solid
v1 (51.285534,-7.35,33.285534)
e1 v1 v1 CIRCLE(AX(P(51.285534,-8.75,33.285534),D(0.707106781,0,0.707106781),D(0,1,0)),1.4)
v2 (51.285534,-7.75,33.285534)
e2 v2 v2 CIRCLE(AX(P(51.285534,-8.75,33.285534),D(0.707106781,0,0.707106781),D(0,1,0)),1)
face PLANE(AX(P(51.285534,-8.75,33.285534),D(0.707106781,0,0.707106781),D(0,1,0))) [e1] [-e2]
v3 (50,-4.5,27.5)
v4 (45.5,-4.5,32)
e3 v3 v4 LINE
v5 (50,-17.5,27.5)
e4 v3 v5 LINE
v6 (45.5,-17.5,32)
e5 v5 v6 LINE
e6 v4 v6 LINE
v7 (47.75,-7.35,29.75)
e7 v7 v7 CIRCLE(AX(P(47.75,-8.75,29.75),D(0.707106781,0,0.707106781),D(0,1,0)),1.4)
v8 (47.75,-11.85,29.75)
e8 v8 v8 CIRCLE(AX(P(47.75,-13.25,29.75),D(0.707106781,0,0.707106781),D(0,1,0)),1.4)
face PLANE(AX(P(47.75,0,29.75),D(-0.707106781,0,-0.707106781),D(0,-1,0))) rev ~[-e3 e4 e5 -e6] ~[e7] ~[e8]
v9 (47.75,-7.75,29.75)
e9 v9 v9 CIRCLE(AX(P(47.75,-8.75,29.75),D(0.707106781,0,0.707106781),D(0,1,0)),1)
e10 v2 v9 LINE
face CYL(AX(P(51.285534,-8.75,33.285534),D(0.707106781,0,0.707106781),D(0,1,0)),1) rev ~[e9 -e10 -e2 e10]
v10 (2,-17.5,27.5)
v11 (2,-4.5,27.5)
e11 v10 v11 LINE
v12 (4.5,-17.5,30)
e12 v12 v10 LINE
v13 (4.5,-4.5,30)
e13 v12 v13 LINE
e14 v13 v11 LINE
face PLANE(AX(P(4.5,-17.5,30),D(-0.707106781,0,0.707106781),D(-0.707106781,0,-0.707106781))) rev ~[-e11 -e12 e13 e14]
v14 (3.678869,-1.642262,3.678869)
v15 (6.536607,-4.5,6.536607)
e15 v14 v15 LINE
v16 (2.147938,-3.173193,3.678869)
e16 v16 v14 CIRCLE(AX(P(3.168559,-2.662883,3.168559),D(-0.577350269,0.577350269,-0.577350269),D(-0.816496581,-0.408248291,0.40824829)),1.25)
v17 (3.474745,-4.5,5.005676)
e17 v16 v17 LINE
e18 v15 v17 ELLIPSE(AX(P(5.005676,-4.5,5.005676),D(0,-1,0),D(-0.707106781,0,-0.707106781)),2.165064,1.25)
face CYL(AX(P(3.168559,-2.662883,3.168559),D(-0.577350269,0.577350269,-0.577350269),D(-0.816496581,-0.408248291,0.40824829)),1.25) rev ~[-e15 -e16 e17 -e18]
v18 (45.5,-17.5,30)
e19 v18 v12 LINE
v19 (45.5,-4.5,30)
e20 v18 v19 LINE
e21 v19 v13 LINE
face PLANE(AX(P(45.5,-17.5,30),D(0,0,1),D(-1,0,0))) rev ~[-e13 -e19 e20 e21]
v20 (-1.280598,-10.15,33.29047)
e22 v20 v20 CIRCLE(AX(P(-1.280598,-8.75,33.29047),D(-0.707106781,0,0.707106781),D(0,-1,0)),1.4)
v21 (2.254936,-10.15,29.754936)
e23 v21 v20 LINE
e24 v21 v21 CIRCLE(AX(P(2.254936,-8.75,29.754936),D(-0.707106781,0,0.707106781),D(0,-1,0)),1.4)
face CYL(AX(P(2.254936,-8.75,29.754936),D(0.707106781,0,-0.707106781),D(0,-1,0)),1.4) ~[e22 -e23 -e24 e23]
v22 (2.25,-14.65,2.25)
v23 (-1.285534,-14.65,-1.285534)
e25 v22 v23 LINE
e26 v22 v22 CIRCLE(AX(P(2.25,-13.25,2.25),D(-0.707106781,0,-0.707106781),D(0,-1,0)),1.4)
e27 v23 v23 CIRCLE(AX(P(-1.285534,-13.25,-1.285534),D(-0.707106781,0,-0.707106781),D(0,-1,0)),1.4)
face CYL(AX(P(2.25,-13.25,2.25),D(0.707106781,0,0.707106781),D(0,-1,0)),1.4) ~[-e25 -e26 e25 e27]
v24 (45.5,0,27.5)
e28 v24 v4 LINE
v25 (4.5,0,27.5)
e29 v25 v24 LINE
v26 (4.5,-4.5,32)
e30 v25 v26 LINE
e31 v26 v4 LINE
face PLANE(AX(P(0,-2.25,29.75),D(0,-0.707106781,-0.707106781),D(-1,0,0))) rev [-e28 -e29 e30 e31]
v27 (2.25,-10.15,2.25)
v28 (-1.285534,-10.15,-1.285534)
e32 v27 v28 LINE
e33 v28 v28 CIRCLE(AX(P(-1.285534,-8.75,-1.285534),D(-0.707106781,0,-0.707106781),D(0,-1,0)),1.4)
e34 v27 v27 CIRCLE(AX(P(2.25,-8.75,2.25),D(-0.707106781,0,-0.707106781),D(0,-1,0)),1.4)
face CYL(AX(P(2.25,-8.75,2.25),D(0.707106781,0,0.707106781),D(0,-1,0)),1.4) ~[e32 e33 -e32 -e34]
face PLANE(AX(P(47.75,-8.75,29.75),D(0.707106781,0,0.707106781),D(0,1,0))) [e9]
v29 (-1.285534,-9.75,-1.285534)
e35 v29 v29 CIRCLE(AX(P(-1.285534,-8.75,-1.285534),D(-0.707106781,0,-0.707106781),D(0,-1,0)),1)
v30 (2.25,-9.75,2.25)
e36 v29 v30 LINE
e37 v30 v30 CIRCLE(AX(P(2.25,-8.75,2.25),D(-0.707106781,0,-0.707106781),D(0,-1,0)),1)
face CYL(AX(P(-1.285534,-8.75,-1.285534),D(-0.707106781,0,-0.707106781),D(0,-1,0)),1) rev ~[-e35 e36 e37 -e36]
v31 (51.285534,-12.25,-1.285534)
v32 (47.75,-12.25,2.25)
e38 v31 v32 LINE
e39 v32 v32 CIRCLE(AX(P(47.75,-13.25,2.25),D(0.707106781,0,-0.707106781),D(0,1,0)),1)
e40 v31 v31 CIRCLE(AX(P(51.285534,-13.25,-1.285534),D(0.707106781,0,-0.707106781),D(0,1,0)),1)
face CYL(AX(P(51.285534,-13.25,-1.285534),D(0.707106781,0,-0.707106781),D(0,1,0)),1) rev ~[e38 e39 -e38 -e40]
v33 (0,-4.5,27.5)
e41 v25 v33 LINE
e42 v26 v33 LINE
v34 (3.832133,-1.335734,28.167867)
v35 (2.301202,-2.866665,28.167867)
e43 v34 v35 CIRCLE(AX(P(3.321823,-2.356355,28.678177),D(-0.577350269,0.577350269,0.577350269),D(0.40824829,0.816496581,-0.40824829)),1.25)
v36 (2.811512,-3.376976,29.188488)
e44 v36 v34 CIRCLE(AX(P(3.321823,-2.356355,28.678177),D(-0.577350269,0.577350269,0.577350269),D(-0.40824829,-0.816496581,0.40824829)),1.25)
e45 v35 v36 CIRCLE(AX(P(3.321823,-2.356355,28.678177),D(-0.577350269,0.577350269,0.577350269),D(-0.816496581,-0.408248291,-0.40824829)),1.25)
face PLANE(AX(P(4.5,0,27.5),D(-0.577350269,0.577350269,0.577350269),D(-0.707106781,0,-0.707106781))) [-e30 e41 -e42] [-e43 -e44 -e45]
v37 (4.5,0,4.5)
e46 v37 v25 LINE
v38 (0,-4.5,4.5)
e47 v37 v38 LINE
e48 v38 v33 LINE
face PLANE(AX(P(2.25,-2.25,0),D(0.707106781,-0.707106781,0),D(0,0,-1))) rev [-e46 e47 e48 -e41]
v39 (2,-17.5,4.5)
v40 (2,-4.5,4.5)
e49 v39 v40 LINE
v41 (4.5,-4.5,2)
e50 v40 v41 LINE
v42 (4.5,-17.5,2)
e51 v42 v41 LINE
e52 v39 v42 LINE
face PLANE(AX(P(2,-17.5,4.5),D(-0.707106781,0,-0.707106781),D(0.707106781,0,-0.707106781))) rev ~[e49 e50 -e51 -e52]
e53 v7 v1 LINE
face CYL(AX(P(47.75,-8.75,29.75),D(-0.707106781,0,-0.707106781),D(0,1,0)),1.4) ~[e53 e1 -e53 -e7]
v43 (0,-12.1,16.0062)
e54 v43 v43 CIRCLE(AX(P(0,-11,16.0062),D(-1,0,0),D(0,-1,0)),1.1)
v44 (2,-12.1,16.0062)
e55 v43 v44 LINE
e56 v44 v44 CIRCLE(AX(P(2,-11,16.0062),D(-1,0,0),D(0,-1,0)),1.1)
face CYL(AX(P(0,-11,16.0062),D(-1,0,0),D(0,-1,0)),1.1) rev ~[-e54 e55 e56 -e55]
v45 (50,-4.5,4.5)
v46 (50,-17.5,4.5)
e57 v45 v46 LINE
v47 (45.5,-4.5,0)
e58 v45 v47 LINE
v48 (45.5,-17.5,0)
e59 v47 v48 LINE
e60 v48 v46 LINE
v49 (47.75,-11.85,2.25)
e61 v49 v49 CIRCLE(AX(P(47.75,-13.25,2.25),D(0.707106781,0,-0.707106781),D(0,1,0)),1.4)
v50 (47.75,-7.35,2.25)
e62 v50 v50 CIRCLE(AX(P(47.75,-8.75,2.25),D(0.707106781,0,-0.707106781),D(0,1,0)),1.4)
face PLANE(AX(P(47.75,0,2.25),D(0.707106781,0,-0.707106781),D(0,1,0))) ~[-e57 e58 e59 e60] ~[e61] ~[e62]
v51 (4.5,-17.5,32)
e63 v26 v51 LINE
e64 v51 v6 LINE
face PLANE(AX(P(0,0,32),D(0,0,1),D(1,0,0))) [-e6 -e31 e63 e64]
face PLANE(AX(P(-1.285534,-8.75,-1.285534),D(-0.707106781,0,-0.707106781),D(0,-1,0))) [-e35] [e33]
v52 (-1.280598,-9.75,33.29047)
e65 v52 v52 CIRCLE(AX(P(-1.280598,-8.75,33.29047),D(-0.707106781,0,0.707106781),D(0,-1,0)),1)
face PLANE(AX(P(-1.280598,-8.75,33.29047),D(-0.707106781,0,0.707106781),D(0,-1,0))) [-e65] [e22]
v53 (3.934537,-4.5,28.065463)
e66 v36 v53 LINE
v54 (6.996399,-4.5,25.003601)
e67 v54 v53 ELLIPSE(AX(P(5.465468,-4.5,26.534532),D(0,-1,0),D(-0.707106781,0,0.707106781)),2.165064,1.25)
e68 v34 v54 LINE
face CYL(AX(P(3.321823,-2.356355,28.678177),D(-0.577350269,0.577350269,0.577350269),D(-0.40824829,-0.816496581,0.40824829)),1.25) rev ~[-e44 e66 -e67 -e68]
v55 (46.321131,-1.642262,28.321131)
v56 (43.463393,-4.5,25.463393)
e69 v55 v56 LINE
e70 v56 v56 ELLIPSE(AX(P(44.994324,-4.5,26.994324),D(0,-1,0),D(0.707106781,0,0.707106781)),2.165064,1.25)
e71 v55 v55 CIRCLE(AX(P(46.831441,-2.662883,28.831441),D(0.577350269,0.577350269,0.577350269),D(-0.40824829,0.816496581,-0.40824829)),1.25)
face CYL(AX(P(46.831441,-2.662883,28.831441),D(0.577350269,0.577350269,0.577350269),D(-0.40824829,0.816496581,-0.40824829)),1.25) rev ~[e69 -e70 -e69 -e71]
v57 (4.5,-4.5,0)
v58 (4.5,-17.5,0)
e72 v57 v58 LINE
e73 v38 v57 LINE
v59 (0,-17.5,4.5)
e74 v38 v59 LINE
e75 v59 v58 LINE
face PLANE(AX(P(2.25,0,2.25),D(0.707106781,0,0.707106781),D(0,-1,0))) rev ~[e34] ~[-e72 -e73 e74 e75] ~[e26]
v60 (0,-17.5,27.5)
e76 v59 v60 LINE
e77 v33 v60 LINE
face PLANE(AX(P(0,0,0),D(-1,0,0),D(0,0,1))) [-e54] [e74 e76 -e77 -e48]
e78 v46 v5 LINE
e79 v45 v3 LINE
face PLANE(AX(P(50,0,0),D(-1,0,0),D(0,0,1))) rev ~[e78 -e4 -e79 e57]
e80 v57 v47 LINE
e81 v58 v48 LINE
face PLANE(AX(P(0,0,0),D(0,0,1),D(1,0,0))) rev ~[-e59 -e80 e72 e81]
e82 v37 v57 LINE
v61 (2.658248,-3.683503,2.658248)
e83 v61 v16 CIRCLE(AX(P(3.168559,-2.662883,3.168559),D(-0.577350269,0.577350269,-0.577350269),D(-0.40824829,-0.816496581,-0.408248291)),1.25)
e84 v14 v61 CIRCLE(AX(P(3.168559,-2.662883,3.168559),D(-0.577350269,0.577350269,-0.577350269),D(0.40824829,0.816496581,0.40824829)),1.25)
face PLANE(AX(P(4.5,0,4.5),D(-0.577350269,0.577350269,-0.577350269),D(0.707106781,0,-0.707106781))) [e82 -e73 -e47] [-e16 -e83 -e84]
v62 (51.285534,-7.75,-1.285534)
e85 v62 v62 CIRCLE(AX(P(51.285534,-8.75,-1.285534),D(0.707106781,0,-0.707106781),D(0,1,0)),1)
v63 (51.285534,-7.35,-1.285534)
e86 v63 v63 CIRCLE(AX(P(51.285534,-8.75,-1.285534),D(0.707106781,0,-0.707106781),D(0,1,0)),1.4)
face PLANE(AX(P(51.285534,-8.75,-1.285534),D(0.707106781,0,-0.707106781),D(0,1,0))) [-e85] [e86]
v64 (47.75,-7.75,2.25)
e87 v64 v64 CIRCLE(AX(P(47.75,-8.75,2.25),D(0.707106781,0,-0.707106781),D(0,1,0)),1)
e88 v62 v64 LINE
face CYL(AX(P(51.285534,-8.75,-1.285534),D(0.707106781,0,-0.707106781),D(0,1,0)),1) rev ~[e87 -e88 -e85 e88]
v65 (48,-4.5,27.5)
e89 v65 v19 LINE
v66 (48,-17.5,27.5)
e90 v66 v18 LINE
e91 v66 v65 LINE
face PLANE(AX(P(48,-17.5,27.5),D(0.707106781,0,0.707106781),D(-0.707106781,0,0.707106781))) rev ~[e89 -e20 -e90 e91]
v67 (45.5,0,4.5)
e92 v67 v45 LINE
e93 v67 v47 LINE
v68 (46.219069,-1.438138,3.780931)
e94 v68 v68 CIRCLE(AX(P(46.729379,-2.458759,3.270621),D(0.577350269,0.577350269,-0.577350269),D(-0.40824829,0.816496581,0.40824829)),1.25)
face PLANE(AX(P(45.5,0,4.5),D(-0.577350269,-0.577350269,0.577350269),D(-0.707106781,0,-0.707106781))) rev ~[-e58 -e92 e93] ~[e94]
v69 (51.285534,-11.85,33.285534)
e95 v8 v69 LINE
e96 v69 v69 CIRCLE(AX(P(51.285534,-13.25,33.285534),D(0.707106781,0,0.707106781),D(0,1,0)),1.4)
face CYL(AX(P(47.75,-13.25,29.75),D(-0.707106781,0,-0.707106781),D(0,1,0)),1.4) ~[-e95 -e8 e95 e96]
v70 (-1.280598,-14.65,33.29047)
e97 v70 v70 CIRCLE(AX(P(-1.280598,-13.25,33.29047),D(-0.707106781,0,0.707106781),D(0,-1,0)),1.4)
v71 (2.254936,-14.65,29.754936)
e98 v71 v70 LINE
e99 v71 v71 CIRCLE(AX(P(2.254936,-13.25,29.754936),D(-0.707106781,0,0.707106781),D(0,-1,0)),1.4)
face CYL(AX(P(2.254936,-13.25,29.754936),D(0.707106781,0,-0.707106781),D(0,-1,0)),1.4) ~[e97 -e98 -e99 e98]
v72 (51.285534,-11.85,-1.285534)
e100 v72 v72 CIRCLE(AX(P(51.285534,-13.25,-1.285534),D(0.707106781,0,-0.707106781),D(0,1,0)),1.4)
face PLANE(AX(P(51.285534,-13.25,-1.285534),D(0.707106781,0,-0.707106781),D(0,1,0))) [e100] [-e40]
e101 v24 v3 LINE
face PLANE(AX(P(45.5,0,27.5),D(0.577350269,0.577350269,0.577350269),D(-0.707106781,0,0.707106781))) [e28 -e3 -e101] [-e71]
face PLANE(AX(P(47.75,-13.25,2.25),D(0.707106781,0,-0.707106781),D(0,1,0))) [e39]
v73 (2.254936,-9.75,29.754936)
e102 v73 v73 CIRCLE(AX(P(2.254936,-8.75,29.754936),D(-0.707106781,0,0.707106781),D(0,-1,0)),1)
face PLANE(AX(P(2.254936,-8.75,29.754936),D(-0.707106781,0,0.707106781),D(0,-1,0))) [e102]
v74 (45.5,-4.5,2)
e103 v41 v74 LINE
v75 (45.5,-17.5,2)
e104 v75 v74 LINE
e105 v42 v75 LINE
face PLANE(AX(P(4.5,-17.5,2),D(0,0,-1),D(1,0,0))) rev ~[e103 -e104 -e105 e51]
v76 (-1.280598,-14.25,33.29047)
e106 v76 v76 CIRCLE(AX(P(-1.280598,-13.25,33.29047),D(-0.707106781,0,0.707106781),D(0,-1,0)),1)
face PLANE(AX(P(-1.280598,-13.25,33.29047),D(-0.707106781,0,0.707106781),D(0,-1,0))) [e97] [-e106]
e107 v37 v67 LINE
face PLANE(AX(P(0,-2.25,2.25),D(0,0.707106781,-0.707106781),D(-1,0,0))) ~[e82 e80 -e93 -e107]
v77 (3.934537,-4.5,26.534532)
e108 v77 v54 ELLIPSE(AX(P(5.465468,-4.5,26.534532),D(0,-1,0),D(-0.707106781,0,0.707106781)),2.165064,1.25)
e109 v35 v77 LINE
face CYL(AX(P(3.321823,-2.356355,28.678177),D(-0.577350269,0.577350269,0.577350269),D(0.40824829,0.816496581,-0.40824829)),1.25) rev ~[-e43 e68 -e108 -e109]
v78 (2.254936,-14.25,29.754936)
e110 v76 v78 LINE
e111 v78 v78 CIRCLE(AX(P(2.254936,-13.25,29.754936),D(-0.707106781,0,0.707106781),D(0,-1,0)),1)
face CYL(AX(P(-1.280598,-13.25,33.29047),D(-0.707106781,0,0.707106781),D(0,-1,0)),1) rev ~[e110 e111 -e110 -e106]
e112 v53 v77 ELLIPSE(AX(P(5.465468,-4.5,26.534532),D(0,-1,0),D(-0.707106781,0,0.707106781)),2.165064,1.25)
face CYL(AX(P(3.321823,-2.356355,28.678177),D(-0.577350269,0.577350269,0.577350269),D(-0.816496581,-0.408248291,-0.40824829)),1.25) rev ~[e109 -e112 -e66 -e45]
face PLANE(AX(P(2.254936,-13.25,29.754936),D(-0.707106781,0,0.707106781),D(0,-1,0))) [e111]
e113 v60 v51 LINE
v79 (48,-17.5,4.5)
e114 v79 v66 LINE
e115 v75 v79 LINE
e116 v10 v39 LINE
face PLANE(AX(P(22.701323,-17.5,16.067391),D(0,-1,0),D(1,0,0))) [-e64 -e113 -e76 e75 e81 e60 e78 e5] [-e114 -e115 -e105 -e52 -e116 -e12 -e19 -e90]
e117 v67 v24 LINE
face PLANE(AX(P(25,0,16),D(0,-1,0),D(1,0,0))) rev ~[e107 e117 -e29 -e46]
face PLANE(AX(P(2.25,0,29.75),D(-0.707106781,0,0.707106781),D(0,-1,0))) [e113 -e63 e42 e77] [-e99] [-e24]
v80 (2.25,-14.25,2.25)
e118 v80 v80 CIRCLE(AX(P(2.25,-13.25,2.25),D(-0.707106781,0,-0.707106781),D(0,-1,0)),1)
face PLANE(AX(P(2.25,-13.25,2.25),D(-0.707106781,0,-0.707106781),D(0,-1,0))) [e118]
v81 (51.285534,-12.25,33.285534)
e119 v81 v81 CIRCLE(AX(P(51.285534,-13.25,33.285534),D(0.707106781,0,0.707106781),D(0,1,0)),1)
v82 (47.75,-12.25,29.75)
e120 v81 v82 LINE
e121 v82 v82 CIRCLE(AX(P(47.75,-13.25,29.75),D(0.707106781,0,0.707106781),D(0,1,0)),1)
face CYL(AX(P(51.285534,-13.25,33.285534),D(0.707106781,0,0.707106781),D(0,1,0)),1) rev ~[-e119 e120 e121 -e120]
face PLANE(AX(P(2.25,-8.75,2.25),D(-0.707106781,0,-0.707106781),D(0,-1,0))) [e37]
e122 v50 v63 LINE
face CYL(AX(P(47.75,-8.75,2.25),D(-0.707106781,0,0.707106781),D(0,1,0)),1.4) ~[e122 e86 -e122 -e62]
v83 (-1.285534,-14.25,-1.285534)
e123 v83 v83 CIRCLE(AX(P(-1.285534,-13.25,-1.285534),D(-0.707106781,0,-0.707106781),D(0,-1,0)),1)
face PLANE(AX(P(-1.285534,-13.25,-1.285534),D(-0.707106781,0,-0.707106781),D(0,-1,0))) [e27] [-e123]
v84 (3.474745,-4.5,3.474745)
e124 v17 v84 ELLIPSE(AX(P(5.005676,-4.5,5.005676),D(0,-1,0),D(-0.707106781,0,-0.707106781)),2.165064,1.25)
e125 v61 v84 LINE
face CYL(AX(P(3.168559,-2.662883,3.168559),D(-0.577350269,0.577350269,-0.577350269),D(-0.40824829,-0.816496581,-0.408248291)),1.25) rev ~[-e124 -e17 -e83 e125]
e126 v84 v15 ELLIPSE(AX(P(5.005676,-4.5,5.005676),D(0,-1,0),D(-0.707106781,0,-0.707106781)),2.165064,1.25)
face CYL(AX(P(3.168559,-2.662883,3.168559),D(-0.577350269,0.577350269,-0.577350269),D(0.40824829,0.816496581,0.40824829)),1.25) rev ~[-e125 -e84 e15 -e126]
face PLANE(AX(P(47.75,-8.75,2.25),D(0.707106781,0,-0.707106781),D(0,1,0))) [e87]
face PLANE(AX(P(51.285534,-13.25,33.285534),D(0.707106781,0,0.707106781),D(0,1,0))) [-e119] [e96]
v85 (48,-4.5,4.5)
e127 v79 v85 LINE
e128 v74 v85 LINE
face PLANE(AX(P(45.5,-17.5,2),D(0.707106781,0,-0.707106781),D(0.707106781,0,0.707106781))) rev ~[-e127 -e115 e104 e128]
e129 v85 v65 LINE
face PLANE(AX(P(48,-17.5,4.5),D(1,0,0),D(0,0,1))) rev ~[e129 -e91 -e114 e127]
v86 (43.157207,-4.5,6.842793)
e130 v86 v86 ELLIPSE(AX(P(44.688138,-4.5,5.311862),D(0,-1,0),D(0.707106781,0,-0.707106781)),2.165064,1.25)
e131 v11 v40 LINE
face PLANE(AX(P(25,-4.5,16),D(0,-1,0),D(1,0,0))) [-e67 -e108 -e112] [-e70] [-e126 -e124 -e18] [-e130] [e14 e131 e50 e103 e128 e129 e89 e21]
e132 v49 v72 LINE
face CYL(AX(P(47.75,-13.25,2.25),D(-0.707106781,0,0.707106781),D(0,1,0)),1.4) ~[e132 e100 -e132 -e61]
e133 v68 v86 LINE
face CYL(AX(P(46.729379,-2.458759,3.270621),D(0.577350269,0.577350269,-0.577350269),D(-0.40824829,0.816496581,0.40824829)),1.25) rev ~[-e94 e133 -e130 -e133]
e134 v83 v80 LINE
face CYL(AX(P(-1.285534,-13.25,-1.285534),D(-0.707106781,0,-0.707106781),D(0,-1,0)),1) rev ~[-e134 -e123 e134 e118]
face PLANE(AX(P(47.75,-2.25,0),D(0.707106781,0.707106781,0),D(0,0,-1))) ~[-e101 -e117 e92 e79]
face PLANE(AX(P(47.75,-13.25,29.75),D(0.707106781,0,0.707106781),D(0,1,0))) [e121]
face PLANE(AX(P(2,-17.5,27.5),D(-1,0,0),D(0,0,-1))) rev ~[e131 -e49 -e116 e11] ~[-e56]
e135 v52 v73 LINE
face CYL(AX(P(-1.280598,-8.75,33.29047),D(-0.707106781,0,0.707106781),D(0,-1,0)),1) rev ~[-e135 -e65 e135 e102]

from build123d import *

# Parameters (mm, degrees)
F0_W      = 50
F0_H      = 32
F1_DEPTH  = 24
F2_SIZE   = 4.5
F3_W      = 64.6181842312
F3_H      = 72.6516954601
F4_DEPTH  = 6.5
F6_DEPTH  = 13
F7_R      = 1.4
F8_DEPTH  = 5
F9_R      = 1.4
F10_DEPTH = 5
F11_R     = 1.4
F12_DEPTH = 5
F13_R     = 1.4
F14_DEPTH = 5
F15_R     = 1
F16_DEPTH = 5
F17_R     = 1
F18_DEPTH = 5
F19_R     = 1
F20_DEPTH = 5
F21_R     = 1
F22_DEPTH = 5
F23_R     = 1.1
F24_DEPTH = 25.4
F25_R     = 1.25
F26_DEPTH = 25.4
F27_R     = 1.25
F28_DEPTH = 25.4
F30_DEPTH = 25.4
F32_DEPTH = 25.4


# Not quite as in the source:
# - a feature names something its author has since deleted; it is built from what else it names


with BuildPart() as f1:
    # F0 (on Front) → F1 (new body)
    with BuildSketch(Plane.XZ):
        with Locations((25, 16)):
            Rectangle(F0_W, F0_H)
    extrude(amount=F1_DEPTH)

    # F2
    f2_edges = [f1.edges().sort_by_distance(p)[0] for p in [
        (50, -12, 0),
        (50, -12, 32),
        (50, 0, 16),
        (50, -24, 16),
        (0, -12, 32),
        (25, 0, 32),
        (25, -24, 32),
        (0, -12, 0),
        (0, 0, 16),
        (0, -24, 16),
        (25, 0, 0),
        (25, -24, 0),
    ]]
    chamfer(f2_edges, length=F2_SIZE)

    # F3 (on face) → F4 (cut)
    with BuildSketch(Plane.XZ.offset(24)):
        with Locations((22.701323498, 16.0673912615)):
            Rectangle(F3_W, F3_H)
    extrude(amount=-F4_DEPTH, mode=Mode.SUBTRACT)

    # F5 (on face) → F6 (cut)
    with BuildSketch(Plane.XZ.offset(17.5)):
        Polygon((4.5, 30), (2, 27.5), (2, 4.5), (4.5, 2), (45.5, 2), (48, 4.5), (48, 27.5), (45.5, 30), align=None)
    extrude(amount=-F6_DEPTH, mode=Mode.SUBTRACT)

    # F7 (on face) → F8 (join)
    with BuildSketch(Plane(origin=(38.75, 0, 38.75), x_dir=(0, 1, 0), z_dir=(0.7071067812, 0, 0.7071067812))):
        with Locations((-13.25, -12.7279220614)):
            Circle(F7_R)
        with Locations((-8.75, -12.7279220614)):
            Circle(F7_R)
    extrude(amount=F8_DEPTH)

    # F9 (on face) → F10 (join)
    with BuildSketch(Plane(origin=(22.75, 0, -22.75), x_dir=(0, 1, 0), z_dir=(0.7071067812, 0, -0.7071067812))):
        with Locations((-13.25, 35.3553390593)):
            Circle(F9_R)
        with Locations((-8.75, 35.3553390593)):
            Circle(F9_R)
    extrude(amount=F10_DEPTH)

    # F11 (on face) → F12 (join)
    with BuildSketch(Plane(origin=(2.25, 0, 2.25), x_dir=(0, -1, 0), z_dir=(-0.7071067812, 0, -0.7071067812))):
        with Locations((13.25, 0)):
            Circle(F11_R)
        with Locations((8.75, 0)):
            Circle(F11_R)
    extrude(amount=F12_DEPTH)

    # F13 (on face) → F14 (join)
    with BuildSketch(Plane(origin=(-13.75, 0, 13.75), x_dir=(0, -1, 0), z_dir=(-0.7071067812, 0, 0.7071067812))):
        with Locations((8.75, 22.6343975133)):
            Circle(F13_R)
        with Locations((13.25, 22.6343975133)):
            Circle(F13_R)
    extrude(amount=F14_DEPTH)

    # F15 (on face) → F16 (cut)
    with BuildSketch(Plane(origin=(42.2855339059, 0, 42.2855339059), x_dir=(0, 1, 0), z_dir=(0.7071067812, 0, 0.7071067812))):
        with Locations((-13.25, -12.7279220614)):
            Circle(F15_R)
        with Locations((-8.75, -12.7279220614)):
            Circle(F15_R)
    extrude(amount=-F16_DEPTH, mode=Mode.SUBTRACT)

    # F17 (on face) → F18 (cut)
    with BuildSketch(Plane(origin=(26.2855339059, 0, -26.2855339059), x_dir=(0, 1, 0), z_dir=(0.7071067812, 0, -0.7071067812))):
        with Locations((-13.25, 35.3553390593)):
            Circle(F17_R)
        with Locations((-8.75, 35.3553390593)):
            Circle(F17_R)
    extrude(amount=-F18_DEPTH, mode=Mode.SUBTRACT)

    # F19 (on face) → F20 (cut)
    with BuildSketch(Plane(origin=(-1.2855339059, 0, -1.2855339059), x_dir=(0, -1, 0), z_dir=(-0.7071067812, 0, -0.7071067812))):
        with Locations((13.25, 0)):
            Circle(F19_R)
        with Locations((8.75, 0)):
            Circle(F19_R)
    extrude(amount=-F20_DEPTH, mode=Mode.SUBTRACT)

    # F21 (on face) → F22 (cut)
    with BuildSketch(Plane(origin=(-17.2855339059, 0, 17.2855339059), x_dir=(0, -1, 0), z_dir=(-0.7071067812, 0, 0.7071067812))):
        with Locations((8.75, 22.6343975133)):
            Circle(F21_R)
        with Locations((13.25, 22.6343975133)):
            Circle(F21_R)
    extrude(amount=-F22_DEPTH, mode=Mode.SUBTRACT)

    # F23 (on face) → F24 (cut)
    with BuildSketch(Plane(origin=(0, 0, 0), x_dir=(0, -1, 0), z_dir=(-1, 0, 0))):
        with Locations((11, 16.0062)):
            Circle(F23_R)
    extrude(amount=-F24_DEPTH, mode=Mode.SUBTRACT)

    # F25 (on face) → F26 (cut)
    with BuildSketch(Plane(origin=(24.3333333333, 24.3333333333, 24.3333333333), x_dir=(-0.4082482905, 0.8164965809, -0.4082482905), z_dir=(0.5773502692, 0.5773502692, 0.5773502692))):
        with Locations((-33.0634771251, -12.7279220614)):
            Circle(F25_R)
    extrude(amount=-F26_DEPTH, mode=Mode.SUBTRACT)

    # F27 (on face) → F28 (cut)
    with BuildSketch(Plane(origin=(13.6666666667, 13.6666666667, -13.6666666667), x_dir=(-0.4082482905, 0.8164965809, 0.4082482905), z_dir=(0.5773502692, 0.5773502692, -0.5773502692))):
        with Locations((-19.7495318303, 35.3553390593)):
            Circle(F27_R)
    extrude(amount=-F28_DEPTH, mode=Mode.SUBTRACT)

    # F29 (on face) → F30 (cut)
    with BuildSketch(Plane(origin=(-7.6666666667, 7.6666666667, 7.6666666667), x_dir=(-0.8164965809, -0.4082482905, -0.4082482905), z_dir=(-0.5773502692, 0.5773502692, 0.5773502692))):
        with BuildLine():
            ThreePointArc((-12.8330958098, 23.027260035), (-14.5406275645, 22.5697282803), (-14.0830958098, 20.8621965255))
            Line((-14.0830958098, 20.8621965255), (-12.8330958098, 23.027260035))
        make_face()
        with BuildLine():
            Line((-12.8330958098, 23.027260035), (-14.0830958098, 20.8621965255))
            ThreePointArc((-14.0830958098, 20.8621965255), (-12.8330958098, 20.8621965255), (-12.2080958098, 21.9447282803))
            ThreePointArc((-12.2080958098, 21.9447282803), (-12.3755640551, 22.5697282803), (-12.8330958098, 23.027260035))
        make_face()
    extrude(amount=-F30_DEPTH, mode=Mode.SUBTRACT)

    # F31 (on face) → F32 (cut)
    with BuildSketch(Plane(origin=(3, -3, 3), x_dir=(-0.8164965809, -0.4082482905, 0.4082482905), z_dir=(-0.5773502692, 0.5773502692, -0.5773502692))):
        with BuildLine():
            ThreePointArc((1.0435586535, 0.3575669008), (0.4185586535, 1.4400986556), (-0.8314413465, 1.4400986556))
            Line((-0.8314413465, 1.4400986556), (0.4185586535, -0.7249648539))
            ThreePointArc((0.4185586535, -0.7249648539), (0.8760904083, -0.2674330992), (1.0435586535, 0.3575669008))
        make_face()
        with BuildLine():
            Line((0.4185586535, -0.7249648539), (-0.8314413465, 1.4400986556))
            ThreePointArc((-0.8314413465, 1.4400986556), (-1.2889731012, -0.2674330992), (0.4185586535, -0.7249648539))
        make_face()
    extrude(amount=-F32_DEPTH, mode=Mode.SUBTRACT)


solid = f1.part
